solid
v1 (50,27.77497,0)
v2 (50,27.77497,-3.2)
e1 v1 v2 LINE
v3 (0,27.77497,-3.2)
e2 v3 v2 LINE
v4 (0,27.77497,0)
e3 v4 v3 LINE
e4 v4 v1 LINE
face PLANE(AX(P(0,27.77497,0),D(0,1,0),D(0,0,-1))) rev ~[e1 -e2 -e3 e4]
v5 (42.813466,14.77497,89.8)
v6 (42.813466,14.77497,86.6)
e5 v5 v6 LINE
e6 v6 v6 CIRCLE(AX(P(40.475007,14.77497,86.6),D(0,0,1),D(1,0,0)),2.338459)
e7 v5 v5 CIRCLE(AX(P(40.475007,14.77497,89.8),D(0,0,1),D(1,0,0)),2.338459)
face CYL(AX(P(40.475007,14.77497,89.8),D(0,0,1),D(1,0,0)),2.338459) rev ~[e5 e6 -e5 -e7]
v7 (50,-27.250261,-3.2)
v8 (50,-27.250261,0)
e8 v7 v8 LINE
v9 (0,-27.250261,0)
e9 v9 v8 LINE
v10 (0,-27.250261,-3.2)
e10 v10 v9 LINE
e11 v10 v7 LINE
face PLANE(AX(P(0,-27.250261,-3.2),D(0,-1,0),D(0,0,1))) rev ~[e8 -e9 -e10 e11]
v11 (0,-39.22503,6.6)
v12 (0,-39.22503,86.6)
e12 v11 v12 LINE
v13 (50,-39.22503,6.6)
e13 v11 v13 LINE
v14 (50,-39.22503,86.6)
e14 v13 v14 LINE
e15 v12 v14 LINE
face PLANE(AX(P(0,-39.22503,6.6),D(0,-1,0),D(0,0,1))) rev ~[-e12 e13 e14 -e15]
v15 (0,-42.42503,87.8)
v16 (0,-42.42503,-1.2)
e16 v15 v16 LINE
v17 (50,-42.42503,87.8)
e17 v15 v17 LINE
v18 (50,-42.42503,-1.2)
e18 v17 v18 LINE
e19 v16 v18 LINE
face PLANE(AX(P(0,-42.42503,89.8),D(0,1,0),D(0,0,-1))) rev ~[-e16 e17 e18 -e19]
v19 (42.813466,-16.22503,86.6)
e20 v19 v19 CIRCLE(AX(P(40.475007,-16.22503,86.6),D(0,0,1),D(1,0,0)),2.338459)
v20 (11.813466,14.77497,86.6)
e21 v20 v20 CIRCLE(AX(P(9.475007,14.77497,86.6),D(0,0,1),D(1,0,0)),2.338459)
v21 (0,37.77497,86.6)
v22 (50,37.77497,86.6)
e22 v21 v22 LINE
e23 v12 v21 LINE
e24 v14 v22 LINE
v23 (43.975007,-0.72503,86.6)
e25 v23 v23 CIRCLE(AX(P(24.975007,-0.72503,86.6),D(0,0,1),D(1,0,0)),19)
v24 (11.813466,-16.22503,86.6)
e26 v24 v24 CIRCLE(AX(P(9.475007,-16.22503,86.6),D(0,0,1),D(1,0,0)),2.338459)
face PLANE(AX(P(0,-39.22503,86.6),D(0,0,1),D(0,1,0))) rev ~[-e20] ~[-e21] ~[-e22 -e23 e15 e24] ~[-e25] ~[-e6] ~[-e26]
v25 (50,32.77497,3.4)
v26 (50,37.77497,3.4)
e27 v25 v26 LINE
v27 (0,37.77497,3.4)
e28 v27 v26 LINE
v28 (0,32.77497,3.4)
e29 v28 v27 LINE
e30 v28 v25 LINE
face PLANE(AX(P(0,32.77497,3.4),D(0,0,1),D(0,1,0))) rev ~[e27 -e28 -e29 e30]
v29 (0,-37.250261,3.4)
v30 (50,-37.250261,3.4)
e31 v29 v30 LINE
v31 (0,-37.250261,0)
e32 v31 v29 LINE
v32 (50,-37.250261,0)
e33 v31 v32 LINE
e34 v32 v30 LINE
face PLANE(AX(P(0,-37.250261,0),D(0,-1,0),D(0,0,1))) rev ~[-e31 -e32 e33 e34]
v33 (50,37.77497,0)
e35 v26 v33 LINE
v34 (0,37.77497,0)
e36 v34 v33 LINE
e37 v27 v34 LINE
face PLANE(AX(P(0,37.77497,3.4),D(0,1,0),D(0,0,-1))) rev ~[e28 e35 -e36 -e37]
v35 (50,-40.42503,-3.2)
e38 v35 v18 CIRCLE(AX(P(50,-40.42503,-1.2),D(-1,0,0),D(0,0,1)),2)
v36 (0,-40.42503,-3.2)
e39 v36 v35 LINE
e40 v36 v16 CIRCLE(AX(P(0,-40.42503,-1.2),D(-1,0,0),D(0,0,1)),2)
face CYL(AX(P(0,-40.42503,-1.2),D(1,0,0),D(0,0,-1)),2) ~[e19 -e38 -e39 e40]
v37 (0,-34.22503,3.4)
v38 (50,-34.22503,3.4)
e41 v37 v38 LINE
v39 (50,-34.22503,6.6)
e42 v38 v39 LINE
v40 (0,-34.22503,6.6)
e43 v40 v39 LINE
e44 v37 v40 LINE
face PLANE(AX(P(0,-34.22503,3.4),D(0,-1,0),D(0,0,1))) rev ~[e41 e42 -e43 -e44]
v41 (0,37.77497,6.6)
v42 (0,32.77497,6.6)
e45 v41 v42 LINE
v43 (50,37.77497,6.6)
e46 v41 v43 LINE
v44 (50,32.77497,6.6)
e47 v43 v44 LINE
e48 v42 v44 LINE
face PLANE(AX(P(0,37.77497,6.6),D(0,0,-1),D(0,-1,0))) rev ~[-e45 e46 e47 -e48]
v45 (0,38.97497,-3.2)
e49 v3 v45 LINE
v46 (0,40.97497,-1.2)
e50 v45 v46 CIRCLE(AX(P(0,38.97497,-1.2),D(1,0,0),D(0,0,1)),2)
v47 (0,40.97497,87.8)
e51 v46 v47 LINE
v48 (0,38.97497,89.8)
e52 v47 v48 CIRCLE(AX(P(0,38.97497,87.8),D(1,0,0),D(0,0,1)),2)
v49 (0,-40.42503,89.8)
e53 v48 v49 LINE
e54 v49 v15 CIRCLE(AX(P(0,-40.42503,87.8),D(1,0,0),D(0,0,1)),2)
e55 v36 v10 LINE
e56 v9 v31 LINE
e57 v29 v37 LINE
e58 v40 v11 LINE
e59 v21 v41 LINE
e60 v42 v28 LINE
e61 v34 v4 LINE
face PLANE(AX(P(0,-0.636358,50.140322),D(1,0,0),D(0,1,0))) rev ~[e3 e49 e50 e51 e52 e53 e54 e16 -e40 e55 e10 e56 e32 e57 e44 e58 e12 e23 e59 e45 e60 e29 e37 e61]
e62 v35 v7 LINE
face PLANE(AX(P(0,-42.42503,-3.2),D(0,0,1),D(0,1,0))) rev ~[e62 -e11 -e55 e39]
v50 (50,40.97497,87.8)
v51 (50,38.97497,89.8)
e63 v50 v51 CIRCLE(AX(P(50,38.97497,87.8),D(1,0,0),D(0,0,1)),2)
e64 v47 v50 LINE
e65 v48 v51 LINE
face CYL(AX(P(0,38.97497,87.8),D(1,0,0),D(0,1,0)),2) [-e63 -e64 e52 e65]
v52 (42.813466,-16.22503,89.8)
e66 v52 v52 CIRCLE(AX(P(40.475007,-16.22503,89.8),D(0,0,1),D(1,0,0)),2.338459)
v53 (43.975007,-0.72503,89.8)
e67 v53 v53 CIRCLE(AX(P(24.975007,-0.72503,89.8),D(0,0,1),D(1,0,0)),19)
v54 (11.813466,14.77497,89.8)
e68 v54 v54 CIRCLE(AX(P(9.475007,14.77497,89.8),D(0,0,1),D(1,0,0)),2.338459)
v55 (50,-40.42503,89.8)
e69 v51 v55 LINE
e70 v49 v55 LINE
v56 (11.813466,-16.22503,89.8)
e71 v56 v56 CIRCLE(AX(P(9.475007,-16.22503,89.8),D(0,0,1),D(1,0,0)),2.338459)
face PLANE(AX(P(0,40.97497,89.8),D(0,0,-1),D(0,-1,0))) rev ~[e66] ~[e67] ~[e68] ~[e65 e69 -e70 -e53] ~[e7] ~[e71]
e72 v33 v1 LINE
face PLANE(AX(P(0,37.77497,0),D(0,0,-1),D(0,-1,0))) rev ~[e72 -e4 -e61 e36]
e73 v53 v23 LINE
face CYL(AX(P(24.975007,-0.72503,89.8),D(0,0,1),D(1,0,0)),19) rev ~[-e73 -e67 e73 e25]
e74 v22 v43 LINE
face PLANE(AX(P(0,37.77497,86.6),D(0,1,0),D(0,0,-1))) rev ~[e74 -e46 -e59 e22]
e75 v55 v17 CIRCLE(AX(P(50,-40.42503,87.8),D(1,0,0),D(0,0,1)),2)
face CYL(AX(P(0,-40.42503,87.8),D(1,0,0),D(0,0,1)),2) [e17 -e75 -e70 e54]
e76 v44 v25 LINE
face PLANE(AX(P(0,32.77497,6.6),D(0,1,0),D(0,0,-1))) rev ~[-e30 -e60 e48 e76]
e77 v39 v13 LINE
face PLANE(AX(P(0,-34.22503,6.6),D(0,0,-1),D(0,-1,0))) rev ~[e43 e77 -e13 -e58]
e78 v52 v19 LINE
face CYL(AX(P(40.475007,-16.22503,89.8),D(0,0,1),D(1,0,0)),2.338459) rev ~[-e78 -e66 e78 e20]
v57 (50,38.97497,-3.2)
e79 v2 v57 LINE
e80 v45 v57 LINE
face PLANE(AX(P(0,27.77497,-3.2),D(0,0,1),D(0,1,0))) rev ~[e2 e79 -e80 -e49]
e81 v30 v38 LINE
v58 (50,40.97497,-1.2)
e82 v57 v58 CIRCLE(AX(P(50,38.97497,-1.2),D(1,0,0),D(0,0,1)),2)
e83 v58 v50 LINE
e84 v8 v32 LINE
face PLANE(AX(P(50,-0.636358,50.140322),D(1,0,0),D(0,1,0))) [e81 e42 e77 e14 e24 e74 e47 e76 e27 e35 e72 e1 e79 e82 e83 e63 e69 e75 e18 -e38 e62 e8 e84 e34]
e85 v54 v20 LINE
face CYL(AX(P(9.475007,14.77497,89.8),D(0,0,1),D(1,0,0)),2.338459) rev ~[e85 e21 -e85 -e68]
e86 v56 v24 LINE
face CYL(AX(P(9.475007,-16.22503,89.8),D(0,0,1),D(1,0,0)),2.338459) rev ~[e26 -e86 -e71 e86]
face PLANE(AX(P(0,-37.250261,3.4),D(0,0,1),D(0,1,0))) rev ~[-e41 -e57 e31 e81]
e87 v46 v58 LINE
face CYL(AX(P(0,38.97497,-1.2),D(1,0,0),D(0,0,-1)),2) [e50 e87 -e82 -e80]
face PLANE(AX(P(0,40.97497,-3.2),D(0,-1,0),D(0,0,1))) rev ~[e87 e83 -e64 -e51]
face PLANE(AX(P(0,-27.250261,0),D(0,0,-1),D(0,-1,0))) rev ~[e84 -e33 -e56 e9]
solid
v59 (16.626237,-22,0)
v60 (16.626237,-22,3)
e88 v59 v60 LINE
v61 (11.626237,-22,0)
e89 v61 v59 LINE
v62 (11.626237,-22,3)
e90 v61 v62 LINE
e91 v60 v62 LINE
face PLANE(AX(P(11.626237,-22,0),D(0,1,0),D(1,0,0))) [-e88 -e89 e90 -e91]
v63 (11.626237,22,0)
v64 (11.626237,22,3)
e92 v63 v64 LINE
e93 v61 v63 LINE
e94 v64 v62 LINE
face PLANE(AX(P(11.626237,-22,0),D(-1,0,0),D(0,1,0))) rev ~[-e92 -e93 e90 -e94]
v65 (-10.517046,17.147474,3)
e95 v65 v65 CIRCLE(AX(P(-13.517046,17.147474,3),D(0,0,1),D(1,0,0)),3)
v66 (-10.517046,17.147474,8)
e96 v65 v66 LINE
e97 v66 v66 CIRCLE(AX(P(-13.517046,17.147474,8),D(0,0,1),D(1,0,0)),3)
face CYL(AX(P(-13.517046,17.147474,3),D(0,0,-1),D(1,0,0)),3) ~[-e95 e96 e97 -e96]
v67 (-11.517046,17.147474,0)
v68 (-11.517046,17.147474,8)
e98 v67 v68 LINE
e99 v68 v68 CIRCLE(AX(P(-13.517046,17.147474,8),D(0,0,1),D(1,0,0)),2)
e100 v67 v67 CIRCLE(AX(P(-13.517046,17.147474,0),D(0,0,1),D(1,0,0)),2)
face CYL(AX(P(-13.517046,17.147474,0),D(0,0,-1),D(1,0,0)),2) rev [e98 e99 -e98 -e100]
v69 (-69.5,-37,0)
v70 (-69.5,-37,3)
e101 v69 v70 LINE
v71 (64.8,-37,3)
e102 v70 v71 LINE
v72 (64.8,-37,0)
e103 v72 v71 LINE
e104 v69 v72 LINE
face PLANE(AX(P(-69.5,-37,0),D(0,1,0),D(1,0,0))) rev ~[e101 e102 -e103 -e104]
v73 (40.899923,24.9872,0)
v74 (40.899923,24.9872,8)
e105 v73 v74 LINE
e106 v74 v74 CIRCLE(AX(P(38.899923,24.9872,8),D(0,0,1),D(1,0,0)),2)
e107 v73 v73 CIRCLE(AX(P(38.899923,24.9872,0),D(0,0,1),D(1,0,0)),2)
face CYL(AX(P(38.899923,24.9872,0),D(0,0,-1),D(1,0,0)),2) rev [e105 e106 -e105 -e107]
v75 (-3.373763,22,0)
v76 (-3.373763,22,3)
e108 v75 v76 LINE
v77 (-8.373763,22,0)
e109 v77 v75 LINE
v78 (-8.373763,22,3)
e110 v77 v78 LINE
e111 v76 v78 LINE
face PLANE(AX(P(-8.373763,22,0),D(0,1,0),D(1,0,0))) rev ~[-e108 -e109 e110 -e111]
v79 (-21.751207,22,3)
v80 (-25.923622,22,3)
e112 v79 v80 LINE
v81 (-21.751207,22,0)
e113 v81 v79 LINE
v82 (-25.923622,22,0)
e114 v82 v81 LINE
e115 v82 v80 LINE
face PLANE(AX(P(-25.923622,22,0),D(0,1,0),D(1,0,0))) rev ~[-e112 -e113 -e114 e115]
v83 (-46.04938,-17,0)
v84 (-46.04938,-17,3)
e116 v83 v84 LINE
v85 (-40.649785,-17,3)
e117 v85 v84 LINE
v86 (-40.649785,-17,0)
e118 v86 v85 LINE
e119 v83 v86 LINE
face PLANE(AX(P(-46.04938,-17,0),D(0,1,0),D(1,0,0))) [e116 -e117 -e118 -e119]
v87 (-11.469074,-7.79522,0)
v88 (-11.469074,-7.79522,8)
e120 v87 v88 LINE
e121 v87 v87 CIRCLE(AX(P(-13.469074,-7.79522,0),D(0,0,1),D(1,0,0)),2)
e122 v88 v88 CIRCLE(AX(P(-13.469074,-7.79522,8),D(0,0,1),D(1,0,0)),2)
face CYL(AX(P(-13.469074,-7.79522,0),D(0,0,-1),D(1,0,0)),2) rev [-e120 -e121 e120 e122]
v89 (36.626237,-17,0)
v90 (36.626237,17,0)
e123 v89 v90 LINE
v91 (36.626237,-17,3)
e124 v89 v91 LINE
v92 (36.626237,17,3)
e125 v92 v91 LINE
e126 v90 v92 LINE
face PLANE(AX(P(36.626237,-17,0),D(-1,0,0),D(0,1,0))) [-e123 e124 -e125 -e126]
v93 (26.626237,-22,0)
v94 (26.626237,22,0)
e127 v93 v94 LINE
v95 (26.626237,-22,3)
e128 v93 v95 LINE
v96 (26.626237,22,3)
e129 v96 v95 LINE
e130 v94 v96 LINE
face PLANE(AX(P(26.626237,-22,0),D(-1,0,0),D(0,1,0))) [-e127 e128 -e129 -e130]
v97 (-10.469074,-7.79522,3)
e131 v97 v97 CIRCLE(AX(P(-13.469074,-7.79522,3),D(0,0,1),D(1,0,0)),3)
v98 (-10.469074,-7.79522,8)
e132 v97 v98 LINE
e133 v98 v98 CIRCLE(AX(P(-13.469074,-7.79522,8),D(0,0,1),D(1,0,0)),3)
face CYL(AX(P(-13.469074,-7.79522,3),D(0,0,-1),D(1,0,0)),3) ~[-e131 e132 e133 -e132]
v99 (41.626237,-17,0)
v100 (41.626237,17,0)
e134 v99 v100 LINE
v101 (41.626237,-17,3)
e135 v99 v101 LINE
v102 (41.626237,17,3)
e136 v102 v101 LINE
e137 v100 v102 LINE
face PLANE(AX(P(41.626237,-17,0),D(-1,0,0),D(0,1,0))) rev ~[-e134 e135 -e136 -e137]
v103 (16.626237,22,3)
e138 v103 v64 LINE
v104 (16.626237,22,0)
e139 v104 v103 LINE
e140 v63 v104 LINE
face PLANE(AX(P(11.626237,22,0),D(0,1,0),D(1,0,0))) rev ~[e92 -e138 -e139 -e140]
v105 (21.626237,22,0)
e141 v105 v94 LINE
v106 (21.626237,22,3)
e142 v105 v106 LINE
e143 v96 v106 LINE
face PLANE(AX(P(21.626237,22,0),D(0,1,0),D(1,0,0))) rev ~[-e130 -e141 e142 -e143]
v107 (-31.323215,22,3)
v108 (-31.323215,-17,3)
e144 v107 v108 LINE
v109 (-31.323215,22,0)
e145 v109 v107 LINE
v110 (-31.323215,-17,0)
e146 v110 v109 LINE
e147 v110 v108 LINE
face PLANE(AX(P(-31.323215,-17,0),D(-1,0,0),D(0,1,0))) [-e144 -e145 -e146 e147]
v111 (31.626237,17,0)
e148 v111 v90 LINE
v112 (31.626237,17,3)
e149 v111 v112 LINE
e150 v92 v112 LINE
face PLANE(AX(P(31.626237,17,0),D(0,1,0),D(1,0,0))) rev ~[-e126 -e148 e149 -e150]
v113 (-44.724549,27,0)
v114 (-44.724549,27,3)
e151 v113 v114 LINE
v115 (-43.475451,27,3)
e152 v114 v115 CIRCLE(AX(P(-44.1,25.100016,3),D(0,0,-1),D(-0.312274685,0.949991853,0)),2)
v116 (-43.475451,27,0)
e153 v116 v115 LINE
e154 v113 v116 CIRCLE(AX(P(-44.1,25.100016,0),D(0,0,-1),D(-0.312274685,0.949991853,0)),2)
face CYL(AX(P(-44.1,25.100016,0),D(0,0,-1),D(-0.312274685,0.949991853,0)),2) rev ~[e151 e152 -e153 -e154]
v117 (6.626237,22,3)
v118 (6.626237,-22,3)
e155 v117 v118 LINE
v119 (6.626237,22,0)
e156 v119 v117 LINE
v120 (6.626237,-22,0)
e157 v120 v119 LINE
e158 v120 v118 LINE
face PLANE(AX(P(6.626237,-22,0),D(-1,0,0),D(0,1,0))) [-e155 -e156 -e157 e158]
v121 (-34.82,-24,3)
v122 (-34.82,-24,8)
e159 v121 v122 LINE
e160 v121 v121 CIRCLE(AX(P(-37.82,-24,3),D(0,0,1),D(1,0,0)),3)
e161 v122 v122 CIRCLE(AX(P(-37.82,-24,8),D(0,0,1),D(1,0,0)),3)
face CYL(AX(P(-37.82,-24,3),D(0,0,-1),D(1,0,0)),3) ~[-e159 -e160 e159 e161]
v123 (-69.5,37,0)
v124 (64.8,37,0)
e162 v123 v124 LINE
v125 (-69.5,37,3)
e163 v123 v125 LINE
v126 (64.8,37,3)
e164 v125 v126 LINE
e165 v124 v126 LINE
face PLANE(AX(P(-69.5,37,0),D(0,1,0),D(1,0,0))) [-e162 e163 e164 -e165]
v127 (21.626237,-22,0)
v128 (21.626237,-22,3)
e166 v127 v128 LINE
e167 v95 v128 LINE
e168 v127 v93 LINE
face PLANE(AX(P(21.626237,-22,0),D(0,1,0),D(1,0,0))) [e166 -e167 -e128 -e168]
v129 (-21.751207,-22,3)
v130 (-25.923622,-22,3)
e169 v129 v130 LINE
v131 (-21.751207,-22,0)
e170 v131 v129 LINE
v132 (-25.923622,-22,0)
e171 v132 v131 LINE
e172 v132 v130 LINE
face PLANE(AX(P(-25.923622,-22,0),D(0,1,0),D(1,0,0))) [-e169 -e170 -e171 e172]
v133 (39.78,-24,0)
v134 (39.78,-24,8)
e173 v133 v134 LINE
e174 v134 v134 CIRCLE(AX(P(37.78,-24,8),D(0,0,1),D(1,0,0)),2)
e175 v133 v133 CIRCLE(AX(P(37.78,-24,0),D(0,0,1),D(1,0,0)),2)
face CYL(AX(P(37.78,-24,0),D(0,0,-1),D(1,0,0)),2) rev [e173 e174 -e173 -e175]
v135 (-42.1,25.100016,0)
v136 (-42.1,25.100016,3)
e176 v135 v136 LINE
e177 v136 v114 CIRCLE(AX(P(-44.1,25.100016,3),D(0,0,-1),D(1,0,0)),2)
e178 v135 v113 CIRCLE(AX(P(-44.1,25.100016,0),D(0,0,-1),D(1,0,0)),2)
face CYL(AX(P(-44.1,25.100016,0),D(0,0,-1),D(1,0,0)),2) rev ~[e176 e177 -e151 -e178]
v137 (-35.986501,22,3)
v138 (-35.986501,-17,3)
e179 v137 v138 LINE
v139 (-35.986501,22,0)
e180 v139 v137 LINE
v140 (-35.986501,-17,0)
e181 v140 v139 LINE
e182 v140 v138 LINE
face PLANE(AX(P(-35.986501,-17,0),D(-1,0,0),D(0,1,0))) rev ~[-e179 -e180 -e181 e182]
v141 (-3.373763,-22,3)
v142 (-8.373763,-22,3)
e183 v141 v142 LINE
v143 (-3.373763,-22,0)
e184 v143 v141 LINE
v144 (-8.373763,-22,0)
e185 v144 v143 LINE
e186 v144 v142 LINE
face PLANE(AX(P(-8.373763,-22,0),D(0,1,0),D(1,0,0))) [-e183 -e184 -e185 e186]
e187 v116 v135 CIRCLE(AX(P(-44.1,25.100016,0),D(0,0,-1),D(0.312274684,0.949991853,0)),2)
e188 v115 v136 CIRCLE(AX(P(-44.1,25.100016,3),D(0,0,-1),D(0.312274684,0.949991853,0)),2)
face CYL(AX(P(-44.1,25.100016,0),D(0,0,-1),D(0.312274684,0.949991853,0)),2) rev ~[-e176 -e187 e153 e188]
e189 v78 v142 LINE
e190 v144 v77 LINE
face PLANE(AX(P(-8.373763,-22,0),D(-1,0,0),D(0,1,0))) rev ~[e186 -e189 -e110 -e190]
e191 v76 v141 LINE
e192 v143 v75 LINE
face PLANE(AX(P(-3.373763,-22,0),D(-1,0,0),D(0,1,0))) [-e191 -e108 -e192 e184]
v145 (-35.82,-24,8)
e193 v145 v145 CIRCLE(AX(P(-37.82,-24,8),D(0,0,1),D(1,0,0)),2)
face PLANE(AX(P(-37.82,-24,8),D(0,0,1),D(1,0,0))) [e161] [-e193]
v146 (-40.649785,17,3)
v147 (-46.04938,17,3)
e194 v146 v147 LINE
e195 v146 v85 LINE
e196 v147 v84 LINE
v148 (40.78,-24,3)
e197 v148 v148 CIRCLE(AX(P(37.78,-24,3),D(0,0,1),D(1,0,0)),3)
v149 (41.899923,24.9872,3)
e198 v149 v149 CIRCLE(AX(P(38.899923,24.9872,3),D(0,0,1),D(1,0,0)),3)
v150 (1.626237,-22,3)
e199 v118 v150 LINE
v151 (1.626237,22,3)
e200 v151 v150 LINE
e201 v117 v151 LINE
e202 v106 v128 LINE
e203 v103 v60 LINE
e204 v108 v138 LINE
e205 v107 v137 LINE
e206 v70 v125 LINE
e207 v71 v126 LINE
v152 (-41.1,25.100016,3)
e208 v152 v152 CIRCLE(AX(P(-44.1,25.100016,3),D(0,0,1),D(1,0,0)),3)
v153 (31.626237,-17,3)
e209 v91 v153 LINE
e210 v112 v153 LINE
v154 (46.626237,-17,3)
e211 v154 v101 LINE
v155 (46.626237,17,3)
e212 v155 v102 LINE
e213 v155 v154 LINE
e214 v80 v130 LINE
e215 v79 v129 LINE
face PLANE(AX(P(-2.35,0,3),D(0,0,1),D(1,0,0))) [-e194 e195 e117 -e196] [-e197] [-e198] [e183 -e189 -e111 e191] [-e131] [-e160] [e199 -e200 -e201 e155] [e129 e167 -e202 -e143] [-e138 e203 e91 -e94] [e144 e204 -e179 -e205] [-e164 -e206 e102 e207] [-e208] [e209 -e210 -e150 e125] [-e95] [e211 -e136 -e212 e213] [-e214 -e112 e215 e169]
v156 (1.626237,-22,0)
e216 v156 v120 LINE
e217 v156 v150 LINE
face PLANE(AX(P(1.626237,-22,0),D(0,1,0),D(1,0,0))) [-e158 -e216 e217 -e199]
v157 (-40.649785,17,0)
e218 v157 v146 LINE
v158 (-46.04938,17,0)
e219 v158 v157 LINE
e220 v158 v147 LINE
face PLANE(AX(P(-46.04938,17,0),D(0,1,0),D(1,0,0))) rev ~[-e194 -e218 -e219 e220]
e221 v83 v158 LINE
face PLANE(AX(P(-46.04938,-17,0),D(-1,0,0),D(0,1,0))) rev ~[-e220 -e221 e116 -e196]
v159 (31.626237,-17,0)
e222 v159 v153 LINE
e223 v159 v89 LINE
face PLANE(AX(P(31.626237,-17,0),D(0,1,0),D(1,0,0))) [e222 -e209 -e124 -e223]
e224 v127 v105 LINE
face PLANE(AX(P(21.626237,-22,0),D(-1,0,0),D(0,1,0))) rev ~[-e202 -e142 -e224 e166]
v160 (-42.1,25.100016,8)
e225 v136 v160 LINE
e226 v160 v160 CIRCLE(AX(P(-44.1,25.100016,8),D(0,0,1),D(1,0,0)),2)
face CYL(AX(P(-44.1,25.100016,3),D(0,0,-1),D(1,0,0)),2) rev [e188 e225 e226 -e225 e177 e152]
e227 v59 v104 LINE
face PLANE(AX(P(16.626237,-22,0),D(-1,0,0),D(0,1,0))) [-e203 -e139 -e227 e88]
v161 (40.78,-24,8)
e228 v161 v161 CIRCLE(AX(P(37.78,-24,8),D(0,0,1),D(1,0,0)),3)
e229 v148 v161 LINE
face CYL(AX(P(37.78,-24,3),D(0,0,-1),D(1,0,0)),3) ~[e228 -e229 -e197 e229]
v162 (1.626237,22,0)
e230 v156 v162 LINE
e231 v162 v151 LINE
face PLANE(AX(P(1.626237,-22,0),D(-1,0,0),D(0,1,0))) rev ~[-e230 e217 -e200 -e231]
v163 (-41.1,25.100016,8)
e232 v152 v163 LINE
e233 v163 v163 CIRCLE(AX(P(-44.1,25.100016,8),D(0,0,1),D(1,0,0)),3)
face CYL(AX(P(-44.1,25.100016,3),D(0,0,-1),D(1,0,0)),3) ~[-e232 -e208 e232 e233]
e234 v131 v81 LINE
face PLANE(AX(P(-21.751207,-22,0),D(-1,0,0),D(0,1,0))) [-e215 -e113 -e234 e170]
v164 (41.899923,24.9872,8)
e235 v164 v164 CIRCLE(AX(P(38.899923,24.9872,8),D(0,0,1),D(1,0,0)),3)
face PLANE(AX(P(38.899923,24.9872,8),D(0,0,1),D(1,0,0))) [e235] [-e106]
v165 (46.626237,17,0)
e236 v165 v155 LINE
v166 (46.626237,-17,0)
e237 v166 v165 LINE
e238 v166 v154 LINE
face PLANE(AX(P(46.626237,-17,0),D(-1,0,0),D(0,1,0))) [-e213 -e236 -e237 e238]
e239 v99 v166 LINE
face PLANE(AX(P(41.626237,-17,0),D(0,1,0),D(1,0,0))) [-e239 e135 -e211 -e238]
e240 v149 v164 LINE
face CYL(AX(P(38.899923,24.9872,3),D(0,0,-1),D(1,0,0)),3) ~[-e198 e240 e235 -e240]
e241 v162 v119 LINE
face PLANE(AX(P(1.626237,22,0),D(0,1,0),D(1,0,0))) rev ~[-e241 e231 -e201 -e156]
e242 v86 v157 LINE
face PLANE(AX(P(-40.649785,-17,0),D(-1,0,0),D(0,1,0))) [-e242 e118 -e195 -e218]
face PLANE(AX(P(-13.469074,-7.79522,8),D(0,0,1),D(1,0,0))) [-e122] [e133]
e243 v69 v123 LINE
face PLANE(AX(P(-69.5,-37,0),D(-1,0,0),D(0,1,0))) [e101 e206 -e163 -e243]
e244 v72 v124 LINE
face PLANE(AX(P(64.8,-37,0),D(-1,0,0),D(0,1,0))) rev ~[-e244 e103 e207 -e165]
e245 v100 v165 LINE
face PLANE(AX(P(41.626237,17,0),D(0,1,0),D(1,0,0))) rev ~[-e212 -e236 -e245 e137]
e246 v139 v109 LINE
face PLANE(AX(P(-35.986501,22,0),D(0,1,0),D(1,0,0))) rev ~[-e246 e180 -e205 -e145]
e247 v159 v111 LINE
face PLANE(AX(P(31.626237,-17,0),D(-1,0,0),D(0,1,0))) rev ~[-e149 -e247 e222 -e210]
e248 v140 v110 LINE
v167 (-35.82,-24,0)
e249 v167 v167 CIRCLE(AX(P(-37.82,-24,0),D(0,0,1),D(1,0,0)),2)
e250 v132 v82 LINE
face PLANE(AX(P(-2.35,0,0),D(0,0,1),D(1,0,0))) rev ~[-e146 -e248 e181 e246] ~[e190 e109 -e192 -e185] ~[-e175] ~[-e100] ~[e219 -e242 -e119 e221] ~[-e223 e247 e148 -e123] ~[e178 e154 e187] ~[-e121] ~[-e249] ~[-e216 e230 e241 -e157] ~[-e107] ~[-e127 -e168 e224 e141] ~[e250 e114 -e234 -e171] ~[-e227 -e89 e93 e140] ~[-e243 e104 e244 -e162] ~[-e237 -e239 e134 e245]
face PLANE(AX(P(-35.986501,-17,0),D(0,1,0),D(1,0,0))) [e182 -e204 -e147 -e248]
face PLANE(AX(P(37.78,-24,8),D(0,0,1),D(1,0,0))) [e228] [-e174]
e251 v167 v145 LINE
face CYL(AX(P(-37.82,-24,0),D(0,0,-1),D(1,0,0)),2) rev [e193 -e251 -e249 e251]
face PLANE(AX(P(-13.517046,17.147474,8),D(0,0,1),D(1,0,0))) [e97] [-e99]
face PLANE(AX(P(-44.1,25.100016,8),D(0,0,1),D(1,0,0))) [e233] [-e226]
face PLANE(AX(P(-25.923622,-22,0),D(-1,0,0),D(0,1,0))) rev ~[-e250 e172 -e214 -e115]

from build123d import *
from build123d import SkipClean  # not in build123d's __all__

# Parameters (mm, degrees)
F0_W      = 134.3
F0_H      = 74
F0_R      = 2
F1_DEPTH  = 3
F2_DEPTH  = 25
F3_R      = 3
F3_R_2    = 2
F4_DEPTH  = 5
F7_W      = 5
F7_H      = 34
F7_H_2    = 44
F7_W_2    = 4.1724147481
F7_W_3    = 4.6632857585
F7_H_3    = 39
F7_W_4    = 5.3995953176
F8_DEPTH  = 25
F10_DEPTH = 50
F11_R     = 2.3384592634
F11_R_2   = 19
F12_DEPTH = 25
F13_R     = 2


# Not quite as in the source:
# - after a boolean that leaves OpenCascade's solid faulty, fix() repairs it
# - a feature names something its author has since deleted; it is built from what else it names


with BuildPart() as f1:
    # F0 (on Top) → F1 (new body)
    with BuildSketch(Plane.XY):
        with Locations((-2.35, 0)):
            Rectangle(F0_W, F0_H)
        with BuildLine():
            Line((-49.5, 22.5), (-46.5, 27))
            Line((-46.5, 27), (-44.7245493689, 27))
            ThreePointArc((-44.7245493689, 27), (-44.1, 27.1000162933), (-43.4754506311, 27))
            Line((-43.4754506311, 27), (48, 27))
            Line((48, 27), (48, 23.31))
            Line((48, 23.31), (49.6, 23.31))
            Line((49.6, 23.31), (49.6, 14.31))
            Line((49.6, 14.31), (48, 14.31))
            Line((48, 14.31), (48, -5.37))
            Line((48, -5.37), (54.8, -5.37))
            Line((54.8, -5.37), (54.8, -17.5))
            Line((54.8, -17.5), (48, -17.5))
            Line((48, -17.5), (48, -27))
            Line((48, -27), (-46.75, -27))
            Line((-46.75, -27), (-46.75, -14.5))
            Line((-46.75, -14.5), (-49.5, -14.5))
            Line((-49.5, -14.5), (-49.5, 22.5))
        make_face(mode=Mode.SUBTRACT)
        with BuildLine():
            Line((-44.7245493689, 27), (-46.5, 27))
            Line((-46.5, 27), (-49.5, 22.5))
            Line((-49.5, 22.5), (-49.5, -14.5))
            Line((-49.5, -14.5), (-46.75, -14.5))
            Line((-46.75, -14.5), (-46.75, -27))
            Line((-46.75, -27), (48, -27))
            Line((48, -27), (48, -17.5))
            Line((48, -17.5), (54.8, -17.5))
            Line((54.8, -17.5), (54.8, -5.37))
            Line((54.8, -5.37), (48, -5.37))
            Line((48, -5.37), (48, 14.31))
            Line((48, 14.31), (49.6, 14.31))
            Line((49.6, 14.31), (49.6, 23.31))
            Line((49.6, 23.31), (48, 23.31))
            Line((48, 23.31), (48, 27))
            Line((48, 27), (-43.4754506311, 27))
            ThreePointArc((-43.4754506311, 27), (-42.4799538991, 26.2728123672), (-42.1, 25.1000162933))
            ThreePointArc((-42.1, 25.1000162933), (-45.272796074, 23.4799701924), (-44.7245493689, 27))
        make_face()
        with Locations((-37.82, -24)):
            Circle(F0_R, mode=Mode.SUBTRACT)
        with Locations((-13.4690740741, -7.7952196389)):
            Circle(F0_R, mode=Mode.SUBTRACT)
        with Locations((37.78, -24)):
            Circle(F0_R, mode=Mode.SUBTRACT)
        with Locations((-13.5170461553, 17.1474736725)):
            Circle(F0_R, mode=Mode.SUBTRACT)
        with Locations((38.8999233283, 24.9872000806)):
            Circle(F0_R, mode=Mode.SUBTRACT)
    extrude(amount=F1_DEPTH)

    # F0 (on Top) → F2 (cut)
    with BuildSketch(Plane.XY):
        with BuildLine():
            ThreePointArc((-43.4754506311, 27), (-44.1, 27.1000162933), (-44.7245493689, 27))
            Line((-44.7245493689, 27), (-43.4754506311, 27))
        make_face()
        with BuildLine():
            Line((-43.4754506311, 27), (-44.7245493689, 27))
            ThreePointArc((-44.7245493689, 27), (-45.272796074, 23.4799701924), (-42.1, 25.1000162933))
            ThreePointArc((-42.1, 25.1000162933), (-42.4799538991, 26.2728123672), (-43.4754506311, 27))
        make_face()
        with Locations((-13.5170461553, 17.1474736725)):
            Circle(F0_R)
        with Locations((38.8999233283, 24.9872000806)):
            Circle(F0_R)
        with Locations((-13.4690740741, -7.7952196389)):
            Circle(F0_R)
        with Locations((-37.82, -24)):
            Circle(F0_R)
        with Locations((37.78, -24)):
            Circle(F0_R)
    extrude(amount=F2_DEPTH, mode=Mode.SUBTRACT)

    # F3 (on face) → F4 (join)
    with BuildSketch(Plane.XY.offset(3)):
        with Locations((-44.1, 25.1000162933)):
            Circle(F3_R)
        with Locations((-44.1, 25.1000162933)):
            Circle(F3_R_2, mode=Mode.SUBTRACT)
        with Locations((-13.5170461553, 17.1474736725)):
            Circle(F3_R)
        with Locations((-13.5170461553, 17.1474736725)):
            Circle(F3_R_2, mode=Mode.SUBTRACT)
        with Locations((38.8999233283, 24.9872000806)):
            Circle(F3_R)
        with Locations((38.8999233283, 24.9872000806)):
            Circle(F3_R_2, mode=Mode.SUBTRACT)
        with Locations((-13.4690740741, -7.7952196389)):
            Circle(F3_R)
        with Locations((-13.4690740741, -7.7952196389)):
            Circle(F3_R_2, mode=Mode.SUBTRACT)
        with Locations((-37.82, -24)):
            Circle(F3_R)
        with Locations((-37.82, -24)):
            Circle(F3_R_2, mode=Mode.SUBTRACT)
        with Locations((37.78, -24)):
            Circle(F3_R)
        with Locations((37.78, -24)):
            Circle(F3_R_2, mode=Mode.SUBTRACT)
    with SkipClean():  # cleaning this boolean's faces spoils the solid; the shape is the same uncleaned
        extrude(amount=F4_DEPTH)

    # F7 (on face) → F8 (cut)
    with BuildSketch(Plane.XY):
        with Locations((44.1262373328, 0)):
            Rectangle(F7_W, F7_H)
        with Locations((24.1262373328, 0)):
            Rectangle(F7_W, F7_H_2)
        with Locations((14.1262373328, 0)):
            Rectangle(F7_W, F7_H_2)
        with Locations((4.1262373328, 0)):
            Rectangle(F7_W, F7_H_2)
        with Locations((-5.8737626672, 0)):
            Rectangle(F7_W, F7_H_2)
        with Locations((-23.837414466, 0)):
            Rectangle(F7_W_2, F7_H_2)
        with Locations((-33.654858008, 2.5)):
            Rectangle(F7_W_3, F7_H_3)
        with Locations((-43.3495822757, 0)):
            Rectangle(F7_W_4, F7_H)
        with Locations((34.1262373328, 0)):
            Rectangle(F7_W, F7_H)
    extrude(amount=F8_DEPTH, mode=Mode.SUBTRACT)

    add(f1.part.fix(), mode=Mode.REPLACE)


with BuildPart() as f10:
    # F9 (on Right) → F10 (new body)
    with BuildSketch(Plane.YZ):
        Polygon((-27.2502614573, 0), (-37.2502614573, 0), (-37.2502614573, 3.4), (-34.2250296303, 3.4), (-34.2250296303, 6.6), (-39.2250296303, 6.6), (-39.2250296303, 86.6), (37.7749703697, 86.6), (37.7749703697, 6.6), (32.7749703697, 6.6), (32.7749703697, 3.4), (37.7749703697, 3.4), (37.7749703697, 0), (27.7749703697, 0), (27.7749703697, -3.2), (40.9749703697, -3.2), (40.9749703697, 89.8), (-42.4250296303, 89.8), (-42.4250296303, -3.2), (-27.2502614573, -3.2), align=None)
    extrude(amount=F10_DEPTH)

    # F11 (on face) → F12 (cut)
    with BuildSketch(Plane.XY.offset(89.8)):
        with Locations((9.4750071671, -16.2250296303)):
            Circle(F11_R)
        with Locations((24.9750071671, -0.7250296303)):
            Circle(F11_R_2)
        with Locations((9.4750071671, 14.7749703697)):
            Circle(F11_R)
        with Locations((40.4750071671, 14.7749703697)):
            Circle(F11_R)
        with Locations((40.4750071671, -16.2250296303)):
            Circle(F11_R)
    extrude(amount=-F12_DEPTH, mode=Mode.SUBTRACT)

    # F13
    f13_edges = [f10.edges().sort_by_distance(p)[0] for p in [
        (25, 40.97497, -3.2),
        (25, -42.42503, -3.2),
        (25, 40.97497, 89.8),
        (25, -42.42503, 89.8),
    ]]
    fillet(f13_edges, radius=F13_R)


solid = Compound([f1.part, f10.part])
